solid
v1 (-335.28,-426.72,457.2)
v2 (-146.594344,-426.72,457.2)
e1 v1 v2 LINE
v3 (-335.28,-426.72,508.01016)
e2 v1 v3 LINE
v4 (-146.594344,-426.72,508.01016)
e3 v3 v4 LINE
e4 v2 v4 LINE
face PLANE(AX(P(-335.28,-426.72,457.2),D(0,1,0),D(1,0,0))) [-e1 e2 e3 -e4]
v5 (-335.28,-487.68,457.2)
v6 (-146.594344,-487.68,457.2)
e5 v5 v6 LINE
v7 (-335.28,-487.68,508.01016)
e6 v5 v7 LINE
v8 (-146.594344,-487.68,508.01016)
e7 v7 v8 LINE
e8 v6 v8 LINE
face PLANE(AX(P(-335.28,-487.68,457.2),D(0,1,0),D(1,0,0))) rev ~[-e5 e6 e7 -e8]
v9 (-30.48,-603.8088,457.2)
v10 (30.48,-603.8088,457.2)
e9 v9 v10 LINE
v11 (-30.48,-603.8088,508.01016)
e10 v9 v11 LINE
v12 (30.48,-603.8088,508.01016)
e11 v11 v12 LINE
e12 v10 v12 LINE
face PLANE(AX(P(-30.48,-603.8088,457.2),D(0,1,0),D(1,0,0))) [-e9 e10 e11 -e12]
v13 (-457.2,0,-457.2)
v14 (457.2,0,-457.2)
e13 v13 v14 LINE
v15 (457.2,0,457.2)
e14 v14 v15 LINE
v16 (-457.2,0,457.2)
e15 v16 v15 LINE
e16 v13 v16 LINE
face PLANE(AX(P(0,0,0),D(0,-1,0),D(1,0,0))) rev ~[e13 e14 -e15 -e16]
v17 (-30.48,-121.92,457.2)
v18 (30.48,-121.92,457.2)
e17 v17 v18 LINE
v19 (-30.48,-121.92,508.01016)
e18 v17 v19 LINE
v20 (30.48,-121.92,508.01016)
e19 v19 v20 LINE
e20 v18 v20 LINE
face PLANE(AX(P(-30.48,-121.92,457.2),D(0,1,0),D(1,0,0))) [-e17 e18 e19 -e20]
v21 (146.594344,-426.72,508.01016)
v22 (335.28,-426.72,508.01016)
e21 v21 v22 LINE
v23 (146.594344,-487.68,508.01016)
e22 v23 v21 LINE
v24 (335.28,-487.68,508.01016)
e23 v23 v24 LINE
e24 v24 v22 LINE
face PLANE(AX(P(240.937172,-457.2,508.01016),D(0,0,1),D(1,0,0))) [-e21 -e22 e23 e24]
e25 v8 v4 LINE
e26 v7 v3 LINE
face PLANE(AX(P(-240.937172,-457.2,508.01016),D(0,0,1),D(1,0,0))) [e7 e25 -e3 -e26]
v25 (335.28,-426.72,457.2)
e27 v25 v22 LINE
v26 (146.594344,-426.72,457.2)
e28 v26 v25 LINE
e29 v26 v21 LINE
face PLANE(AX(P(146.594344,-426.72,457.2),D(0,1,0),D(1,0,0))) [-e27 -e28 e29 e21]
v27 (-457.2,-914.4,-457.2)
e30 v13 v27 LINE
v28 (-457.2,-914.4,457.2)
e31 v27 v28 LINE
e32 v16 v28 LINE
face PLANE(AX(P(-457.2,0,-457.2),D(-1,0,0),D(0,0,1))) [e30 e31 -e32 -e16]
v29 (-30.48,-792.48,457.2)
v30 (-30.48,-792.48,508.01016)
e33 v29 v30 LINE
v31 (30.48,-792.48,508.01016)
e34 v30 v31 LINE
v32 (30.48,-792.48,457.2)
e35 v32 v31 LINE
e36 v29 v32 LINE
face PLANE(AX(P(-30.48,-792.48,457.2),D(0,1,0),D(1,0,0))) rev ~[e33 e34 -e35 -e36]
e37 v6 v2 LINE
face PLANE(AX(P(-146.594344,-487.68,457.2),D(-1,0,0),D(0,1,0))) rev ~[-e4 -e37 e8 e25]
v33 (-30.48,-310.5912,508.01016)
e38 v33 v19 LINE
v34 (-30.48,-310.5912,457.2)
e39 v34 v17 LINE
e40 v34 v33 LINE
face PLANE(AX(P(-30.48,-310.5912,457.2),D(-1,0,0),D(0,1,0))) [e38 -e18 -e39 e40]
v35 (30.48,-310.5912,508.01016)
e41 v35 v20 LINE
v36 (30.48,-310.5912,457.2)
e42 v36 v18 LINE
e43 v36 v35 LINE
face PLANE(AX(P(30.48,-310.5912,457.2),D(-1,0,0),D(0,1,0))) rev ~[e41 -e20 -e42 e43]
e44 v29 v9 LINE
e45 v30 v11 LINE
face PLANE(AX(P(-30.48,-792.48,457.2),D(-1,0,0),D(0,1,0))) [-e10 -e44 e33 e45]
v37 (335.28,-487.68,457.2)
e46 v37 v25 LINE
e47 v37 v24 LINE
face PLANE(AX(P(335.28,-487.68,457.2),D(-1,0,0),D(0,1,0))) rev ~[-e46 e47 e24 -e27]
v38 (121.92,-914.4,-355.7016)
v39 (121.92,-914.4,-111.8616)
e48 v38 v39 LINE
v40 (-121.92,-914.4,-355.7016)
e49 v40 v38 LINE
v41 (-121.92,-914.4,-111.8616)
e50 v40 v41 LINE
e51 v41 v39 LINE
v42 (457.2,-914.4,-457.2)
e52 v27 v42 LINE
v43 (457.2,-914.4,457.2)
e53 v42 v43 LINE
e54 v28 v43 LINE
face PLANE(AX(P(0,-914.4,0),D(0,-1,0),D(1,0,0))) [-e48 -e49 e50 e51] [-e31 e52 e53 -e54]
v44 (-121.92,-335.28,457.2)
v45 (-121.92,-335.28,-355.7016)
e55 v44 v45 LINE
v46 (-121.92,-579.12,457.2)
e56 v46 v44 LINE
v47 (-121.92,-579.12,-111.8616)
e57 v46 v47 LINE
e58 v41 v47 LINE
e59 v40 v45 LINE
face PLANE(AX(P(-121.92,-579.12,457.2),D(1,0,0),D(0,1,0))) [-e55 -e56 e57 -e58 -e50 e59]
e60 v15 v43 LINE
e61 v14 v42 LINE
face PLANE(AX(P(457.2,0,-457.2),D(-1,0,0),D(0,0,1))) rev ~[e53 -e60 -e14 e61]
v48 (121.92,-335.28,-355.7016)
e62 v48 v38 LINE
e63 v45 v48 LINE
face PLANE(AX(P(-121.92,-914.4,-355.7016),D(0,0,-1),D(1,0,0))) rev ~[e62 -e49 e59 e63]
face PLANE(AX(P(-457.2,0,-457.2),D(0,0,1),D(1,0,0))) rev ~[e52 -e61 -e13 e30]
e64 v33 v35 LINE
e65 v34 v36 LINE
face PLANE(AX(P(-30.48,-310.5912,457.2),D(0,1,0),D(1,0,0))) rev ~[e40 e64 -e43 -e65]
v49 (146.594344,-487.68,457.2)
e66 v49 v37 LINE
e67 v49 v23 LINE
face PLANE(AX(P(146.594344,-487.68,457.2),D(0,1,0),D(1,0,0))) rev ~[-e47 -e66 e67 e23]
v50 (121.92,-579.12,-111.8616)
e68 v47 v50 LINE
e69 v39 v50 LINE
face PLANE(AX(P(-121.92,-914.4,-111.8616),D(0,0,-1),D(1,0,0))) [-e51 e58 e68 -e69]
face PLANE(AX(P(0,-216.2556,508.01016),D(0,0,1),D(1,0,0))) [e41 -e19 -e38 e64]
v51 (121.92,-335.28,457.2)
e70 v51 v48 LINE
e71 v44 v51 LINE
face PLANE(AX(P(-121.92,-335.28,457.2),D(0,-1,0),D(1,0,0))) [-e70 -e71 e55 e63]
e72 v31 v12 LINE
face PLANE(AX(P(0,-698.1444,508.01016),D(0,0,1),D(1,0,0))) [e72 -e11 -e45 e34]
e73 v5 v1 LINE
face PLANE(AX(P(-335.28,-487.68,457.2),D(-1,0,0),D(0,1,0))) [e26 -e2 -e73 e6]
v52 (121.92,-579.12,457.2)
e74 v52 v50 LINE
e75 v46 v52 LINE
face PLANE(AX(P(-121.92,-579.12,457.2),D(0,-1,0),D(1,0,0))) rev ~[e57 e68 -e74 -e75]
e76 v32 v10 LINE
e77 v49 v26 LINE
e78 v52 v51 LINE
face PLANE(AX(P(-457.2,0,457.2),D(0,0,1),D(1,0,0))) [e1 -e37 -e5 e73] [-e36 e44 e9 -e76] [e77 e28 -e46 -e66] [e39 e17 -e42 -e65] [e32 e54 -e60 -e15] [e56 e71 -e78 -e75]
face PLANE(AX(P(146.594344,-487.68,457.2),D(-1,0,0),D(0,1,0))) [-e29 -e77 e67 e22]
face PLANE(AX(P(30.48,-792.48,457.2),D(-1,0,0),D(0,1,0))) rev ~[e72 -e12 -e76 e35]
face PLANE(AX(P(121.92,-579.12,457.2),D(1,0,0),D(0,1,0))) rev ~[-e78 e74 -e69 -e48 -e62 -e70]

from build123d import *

# Parameters (mm, degrees)
F0_W          = 914.4
F0_H          = 914.4
F1_DEPTH      = 914.4
F2_W          = 243.84
F2_H          = 243.84
F3_DEPTH      = 335.28
F4_W          = 243.84
F4_H          = 243.84
F5_DEPTH      = 812.9016
F6_W          = 188.6856555939
F6_H          = 60.96
F6_W_2        = 60.96
F6_H_2        = 188.6712
F7_DEPTH      = 50.81016
F7_DEPTH_BACK = 30.48


# Not quite as in the source:
# - a feature names something its author has since deleted; it is built from what else it names


with BuildPart() as f1:
    # F0 (on Front) → F1 (new body)
    with BuildSketch(Plane.XZ):
        Rectangle(F0_W, F0_H)
    extrude(amount=F1_DEPTH)

    # F2 (on face) → F3 (cut)
    with BuildSketch(Plane.XZ.offset(914.4)):
        with Locations((0, -233.7816)):
            Rectangle(F2_W, F2_H)
    extrude(amount=-F3_DEPTH, mode=Mode.SUBTRACT)

    # F4 (on face) → F5 (cut)
    with BuildSketch(Plane.XY.offset(457.2)):
        with Locations((0, -457.2)):
            Rectangle(F4_W, F4_H)
    extrude(amount=-F5_DEPTH, mode=Mode.SUBTRACT)

    # F6 (on face) → F7 (join, two sides)
    with BuildSketch(Plane.XY.offset(457.2)) as f7_sk:
        with Locations((240.9371722031, -457.2)):
            Rectangle(F6_W, F6_H)
        with Locations((0, -216.2556)):
            Rectangle(F6_W_2, F6_H_2)
        with Locations((-240.9371722031, -457.2)):
            Rectangle(F6_W, F6_H)
        with Locations((0, -698.1444)):
            Rectangle(F6_W_2, F6_H_2)
    extrude(amount=F7_DEPTH)
    extrude(f7_sk.sketch, amount=-F7_DEPTH_BACK)


solid = f1.part
